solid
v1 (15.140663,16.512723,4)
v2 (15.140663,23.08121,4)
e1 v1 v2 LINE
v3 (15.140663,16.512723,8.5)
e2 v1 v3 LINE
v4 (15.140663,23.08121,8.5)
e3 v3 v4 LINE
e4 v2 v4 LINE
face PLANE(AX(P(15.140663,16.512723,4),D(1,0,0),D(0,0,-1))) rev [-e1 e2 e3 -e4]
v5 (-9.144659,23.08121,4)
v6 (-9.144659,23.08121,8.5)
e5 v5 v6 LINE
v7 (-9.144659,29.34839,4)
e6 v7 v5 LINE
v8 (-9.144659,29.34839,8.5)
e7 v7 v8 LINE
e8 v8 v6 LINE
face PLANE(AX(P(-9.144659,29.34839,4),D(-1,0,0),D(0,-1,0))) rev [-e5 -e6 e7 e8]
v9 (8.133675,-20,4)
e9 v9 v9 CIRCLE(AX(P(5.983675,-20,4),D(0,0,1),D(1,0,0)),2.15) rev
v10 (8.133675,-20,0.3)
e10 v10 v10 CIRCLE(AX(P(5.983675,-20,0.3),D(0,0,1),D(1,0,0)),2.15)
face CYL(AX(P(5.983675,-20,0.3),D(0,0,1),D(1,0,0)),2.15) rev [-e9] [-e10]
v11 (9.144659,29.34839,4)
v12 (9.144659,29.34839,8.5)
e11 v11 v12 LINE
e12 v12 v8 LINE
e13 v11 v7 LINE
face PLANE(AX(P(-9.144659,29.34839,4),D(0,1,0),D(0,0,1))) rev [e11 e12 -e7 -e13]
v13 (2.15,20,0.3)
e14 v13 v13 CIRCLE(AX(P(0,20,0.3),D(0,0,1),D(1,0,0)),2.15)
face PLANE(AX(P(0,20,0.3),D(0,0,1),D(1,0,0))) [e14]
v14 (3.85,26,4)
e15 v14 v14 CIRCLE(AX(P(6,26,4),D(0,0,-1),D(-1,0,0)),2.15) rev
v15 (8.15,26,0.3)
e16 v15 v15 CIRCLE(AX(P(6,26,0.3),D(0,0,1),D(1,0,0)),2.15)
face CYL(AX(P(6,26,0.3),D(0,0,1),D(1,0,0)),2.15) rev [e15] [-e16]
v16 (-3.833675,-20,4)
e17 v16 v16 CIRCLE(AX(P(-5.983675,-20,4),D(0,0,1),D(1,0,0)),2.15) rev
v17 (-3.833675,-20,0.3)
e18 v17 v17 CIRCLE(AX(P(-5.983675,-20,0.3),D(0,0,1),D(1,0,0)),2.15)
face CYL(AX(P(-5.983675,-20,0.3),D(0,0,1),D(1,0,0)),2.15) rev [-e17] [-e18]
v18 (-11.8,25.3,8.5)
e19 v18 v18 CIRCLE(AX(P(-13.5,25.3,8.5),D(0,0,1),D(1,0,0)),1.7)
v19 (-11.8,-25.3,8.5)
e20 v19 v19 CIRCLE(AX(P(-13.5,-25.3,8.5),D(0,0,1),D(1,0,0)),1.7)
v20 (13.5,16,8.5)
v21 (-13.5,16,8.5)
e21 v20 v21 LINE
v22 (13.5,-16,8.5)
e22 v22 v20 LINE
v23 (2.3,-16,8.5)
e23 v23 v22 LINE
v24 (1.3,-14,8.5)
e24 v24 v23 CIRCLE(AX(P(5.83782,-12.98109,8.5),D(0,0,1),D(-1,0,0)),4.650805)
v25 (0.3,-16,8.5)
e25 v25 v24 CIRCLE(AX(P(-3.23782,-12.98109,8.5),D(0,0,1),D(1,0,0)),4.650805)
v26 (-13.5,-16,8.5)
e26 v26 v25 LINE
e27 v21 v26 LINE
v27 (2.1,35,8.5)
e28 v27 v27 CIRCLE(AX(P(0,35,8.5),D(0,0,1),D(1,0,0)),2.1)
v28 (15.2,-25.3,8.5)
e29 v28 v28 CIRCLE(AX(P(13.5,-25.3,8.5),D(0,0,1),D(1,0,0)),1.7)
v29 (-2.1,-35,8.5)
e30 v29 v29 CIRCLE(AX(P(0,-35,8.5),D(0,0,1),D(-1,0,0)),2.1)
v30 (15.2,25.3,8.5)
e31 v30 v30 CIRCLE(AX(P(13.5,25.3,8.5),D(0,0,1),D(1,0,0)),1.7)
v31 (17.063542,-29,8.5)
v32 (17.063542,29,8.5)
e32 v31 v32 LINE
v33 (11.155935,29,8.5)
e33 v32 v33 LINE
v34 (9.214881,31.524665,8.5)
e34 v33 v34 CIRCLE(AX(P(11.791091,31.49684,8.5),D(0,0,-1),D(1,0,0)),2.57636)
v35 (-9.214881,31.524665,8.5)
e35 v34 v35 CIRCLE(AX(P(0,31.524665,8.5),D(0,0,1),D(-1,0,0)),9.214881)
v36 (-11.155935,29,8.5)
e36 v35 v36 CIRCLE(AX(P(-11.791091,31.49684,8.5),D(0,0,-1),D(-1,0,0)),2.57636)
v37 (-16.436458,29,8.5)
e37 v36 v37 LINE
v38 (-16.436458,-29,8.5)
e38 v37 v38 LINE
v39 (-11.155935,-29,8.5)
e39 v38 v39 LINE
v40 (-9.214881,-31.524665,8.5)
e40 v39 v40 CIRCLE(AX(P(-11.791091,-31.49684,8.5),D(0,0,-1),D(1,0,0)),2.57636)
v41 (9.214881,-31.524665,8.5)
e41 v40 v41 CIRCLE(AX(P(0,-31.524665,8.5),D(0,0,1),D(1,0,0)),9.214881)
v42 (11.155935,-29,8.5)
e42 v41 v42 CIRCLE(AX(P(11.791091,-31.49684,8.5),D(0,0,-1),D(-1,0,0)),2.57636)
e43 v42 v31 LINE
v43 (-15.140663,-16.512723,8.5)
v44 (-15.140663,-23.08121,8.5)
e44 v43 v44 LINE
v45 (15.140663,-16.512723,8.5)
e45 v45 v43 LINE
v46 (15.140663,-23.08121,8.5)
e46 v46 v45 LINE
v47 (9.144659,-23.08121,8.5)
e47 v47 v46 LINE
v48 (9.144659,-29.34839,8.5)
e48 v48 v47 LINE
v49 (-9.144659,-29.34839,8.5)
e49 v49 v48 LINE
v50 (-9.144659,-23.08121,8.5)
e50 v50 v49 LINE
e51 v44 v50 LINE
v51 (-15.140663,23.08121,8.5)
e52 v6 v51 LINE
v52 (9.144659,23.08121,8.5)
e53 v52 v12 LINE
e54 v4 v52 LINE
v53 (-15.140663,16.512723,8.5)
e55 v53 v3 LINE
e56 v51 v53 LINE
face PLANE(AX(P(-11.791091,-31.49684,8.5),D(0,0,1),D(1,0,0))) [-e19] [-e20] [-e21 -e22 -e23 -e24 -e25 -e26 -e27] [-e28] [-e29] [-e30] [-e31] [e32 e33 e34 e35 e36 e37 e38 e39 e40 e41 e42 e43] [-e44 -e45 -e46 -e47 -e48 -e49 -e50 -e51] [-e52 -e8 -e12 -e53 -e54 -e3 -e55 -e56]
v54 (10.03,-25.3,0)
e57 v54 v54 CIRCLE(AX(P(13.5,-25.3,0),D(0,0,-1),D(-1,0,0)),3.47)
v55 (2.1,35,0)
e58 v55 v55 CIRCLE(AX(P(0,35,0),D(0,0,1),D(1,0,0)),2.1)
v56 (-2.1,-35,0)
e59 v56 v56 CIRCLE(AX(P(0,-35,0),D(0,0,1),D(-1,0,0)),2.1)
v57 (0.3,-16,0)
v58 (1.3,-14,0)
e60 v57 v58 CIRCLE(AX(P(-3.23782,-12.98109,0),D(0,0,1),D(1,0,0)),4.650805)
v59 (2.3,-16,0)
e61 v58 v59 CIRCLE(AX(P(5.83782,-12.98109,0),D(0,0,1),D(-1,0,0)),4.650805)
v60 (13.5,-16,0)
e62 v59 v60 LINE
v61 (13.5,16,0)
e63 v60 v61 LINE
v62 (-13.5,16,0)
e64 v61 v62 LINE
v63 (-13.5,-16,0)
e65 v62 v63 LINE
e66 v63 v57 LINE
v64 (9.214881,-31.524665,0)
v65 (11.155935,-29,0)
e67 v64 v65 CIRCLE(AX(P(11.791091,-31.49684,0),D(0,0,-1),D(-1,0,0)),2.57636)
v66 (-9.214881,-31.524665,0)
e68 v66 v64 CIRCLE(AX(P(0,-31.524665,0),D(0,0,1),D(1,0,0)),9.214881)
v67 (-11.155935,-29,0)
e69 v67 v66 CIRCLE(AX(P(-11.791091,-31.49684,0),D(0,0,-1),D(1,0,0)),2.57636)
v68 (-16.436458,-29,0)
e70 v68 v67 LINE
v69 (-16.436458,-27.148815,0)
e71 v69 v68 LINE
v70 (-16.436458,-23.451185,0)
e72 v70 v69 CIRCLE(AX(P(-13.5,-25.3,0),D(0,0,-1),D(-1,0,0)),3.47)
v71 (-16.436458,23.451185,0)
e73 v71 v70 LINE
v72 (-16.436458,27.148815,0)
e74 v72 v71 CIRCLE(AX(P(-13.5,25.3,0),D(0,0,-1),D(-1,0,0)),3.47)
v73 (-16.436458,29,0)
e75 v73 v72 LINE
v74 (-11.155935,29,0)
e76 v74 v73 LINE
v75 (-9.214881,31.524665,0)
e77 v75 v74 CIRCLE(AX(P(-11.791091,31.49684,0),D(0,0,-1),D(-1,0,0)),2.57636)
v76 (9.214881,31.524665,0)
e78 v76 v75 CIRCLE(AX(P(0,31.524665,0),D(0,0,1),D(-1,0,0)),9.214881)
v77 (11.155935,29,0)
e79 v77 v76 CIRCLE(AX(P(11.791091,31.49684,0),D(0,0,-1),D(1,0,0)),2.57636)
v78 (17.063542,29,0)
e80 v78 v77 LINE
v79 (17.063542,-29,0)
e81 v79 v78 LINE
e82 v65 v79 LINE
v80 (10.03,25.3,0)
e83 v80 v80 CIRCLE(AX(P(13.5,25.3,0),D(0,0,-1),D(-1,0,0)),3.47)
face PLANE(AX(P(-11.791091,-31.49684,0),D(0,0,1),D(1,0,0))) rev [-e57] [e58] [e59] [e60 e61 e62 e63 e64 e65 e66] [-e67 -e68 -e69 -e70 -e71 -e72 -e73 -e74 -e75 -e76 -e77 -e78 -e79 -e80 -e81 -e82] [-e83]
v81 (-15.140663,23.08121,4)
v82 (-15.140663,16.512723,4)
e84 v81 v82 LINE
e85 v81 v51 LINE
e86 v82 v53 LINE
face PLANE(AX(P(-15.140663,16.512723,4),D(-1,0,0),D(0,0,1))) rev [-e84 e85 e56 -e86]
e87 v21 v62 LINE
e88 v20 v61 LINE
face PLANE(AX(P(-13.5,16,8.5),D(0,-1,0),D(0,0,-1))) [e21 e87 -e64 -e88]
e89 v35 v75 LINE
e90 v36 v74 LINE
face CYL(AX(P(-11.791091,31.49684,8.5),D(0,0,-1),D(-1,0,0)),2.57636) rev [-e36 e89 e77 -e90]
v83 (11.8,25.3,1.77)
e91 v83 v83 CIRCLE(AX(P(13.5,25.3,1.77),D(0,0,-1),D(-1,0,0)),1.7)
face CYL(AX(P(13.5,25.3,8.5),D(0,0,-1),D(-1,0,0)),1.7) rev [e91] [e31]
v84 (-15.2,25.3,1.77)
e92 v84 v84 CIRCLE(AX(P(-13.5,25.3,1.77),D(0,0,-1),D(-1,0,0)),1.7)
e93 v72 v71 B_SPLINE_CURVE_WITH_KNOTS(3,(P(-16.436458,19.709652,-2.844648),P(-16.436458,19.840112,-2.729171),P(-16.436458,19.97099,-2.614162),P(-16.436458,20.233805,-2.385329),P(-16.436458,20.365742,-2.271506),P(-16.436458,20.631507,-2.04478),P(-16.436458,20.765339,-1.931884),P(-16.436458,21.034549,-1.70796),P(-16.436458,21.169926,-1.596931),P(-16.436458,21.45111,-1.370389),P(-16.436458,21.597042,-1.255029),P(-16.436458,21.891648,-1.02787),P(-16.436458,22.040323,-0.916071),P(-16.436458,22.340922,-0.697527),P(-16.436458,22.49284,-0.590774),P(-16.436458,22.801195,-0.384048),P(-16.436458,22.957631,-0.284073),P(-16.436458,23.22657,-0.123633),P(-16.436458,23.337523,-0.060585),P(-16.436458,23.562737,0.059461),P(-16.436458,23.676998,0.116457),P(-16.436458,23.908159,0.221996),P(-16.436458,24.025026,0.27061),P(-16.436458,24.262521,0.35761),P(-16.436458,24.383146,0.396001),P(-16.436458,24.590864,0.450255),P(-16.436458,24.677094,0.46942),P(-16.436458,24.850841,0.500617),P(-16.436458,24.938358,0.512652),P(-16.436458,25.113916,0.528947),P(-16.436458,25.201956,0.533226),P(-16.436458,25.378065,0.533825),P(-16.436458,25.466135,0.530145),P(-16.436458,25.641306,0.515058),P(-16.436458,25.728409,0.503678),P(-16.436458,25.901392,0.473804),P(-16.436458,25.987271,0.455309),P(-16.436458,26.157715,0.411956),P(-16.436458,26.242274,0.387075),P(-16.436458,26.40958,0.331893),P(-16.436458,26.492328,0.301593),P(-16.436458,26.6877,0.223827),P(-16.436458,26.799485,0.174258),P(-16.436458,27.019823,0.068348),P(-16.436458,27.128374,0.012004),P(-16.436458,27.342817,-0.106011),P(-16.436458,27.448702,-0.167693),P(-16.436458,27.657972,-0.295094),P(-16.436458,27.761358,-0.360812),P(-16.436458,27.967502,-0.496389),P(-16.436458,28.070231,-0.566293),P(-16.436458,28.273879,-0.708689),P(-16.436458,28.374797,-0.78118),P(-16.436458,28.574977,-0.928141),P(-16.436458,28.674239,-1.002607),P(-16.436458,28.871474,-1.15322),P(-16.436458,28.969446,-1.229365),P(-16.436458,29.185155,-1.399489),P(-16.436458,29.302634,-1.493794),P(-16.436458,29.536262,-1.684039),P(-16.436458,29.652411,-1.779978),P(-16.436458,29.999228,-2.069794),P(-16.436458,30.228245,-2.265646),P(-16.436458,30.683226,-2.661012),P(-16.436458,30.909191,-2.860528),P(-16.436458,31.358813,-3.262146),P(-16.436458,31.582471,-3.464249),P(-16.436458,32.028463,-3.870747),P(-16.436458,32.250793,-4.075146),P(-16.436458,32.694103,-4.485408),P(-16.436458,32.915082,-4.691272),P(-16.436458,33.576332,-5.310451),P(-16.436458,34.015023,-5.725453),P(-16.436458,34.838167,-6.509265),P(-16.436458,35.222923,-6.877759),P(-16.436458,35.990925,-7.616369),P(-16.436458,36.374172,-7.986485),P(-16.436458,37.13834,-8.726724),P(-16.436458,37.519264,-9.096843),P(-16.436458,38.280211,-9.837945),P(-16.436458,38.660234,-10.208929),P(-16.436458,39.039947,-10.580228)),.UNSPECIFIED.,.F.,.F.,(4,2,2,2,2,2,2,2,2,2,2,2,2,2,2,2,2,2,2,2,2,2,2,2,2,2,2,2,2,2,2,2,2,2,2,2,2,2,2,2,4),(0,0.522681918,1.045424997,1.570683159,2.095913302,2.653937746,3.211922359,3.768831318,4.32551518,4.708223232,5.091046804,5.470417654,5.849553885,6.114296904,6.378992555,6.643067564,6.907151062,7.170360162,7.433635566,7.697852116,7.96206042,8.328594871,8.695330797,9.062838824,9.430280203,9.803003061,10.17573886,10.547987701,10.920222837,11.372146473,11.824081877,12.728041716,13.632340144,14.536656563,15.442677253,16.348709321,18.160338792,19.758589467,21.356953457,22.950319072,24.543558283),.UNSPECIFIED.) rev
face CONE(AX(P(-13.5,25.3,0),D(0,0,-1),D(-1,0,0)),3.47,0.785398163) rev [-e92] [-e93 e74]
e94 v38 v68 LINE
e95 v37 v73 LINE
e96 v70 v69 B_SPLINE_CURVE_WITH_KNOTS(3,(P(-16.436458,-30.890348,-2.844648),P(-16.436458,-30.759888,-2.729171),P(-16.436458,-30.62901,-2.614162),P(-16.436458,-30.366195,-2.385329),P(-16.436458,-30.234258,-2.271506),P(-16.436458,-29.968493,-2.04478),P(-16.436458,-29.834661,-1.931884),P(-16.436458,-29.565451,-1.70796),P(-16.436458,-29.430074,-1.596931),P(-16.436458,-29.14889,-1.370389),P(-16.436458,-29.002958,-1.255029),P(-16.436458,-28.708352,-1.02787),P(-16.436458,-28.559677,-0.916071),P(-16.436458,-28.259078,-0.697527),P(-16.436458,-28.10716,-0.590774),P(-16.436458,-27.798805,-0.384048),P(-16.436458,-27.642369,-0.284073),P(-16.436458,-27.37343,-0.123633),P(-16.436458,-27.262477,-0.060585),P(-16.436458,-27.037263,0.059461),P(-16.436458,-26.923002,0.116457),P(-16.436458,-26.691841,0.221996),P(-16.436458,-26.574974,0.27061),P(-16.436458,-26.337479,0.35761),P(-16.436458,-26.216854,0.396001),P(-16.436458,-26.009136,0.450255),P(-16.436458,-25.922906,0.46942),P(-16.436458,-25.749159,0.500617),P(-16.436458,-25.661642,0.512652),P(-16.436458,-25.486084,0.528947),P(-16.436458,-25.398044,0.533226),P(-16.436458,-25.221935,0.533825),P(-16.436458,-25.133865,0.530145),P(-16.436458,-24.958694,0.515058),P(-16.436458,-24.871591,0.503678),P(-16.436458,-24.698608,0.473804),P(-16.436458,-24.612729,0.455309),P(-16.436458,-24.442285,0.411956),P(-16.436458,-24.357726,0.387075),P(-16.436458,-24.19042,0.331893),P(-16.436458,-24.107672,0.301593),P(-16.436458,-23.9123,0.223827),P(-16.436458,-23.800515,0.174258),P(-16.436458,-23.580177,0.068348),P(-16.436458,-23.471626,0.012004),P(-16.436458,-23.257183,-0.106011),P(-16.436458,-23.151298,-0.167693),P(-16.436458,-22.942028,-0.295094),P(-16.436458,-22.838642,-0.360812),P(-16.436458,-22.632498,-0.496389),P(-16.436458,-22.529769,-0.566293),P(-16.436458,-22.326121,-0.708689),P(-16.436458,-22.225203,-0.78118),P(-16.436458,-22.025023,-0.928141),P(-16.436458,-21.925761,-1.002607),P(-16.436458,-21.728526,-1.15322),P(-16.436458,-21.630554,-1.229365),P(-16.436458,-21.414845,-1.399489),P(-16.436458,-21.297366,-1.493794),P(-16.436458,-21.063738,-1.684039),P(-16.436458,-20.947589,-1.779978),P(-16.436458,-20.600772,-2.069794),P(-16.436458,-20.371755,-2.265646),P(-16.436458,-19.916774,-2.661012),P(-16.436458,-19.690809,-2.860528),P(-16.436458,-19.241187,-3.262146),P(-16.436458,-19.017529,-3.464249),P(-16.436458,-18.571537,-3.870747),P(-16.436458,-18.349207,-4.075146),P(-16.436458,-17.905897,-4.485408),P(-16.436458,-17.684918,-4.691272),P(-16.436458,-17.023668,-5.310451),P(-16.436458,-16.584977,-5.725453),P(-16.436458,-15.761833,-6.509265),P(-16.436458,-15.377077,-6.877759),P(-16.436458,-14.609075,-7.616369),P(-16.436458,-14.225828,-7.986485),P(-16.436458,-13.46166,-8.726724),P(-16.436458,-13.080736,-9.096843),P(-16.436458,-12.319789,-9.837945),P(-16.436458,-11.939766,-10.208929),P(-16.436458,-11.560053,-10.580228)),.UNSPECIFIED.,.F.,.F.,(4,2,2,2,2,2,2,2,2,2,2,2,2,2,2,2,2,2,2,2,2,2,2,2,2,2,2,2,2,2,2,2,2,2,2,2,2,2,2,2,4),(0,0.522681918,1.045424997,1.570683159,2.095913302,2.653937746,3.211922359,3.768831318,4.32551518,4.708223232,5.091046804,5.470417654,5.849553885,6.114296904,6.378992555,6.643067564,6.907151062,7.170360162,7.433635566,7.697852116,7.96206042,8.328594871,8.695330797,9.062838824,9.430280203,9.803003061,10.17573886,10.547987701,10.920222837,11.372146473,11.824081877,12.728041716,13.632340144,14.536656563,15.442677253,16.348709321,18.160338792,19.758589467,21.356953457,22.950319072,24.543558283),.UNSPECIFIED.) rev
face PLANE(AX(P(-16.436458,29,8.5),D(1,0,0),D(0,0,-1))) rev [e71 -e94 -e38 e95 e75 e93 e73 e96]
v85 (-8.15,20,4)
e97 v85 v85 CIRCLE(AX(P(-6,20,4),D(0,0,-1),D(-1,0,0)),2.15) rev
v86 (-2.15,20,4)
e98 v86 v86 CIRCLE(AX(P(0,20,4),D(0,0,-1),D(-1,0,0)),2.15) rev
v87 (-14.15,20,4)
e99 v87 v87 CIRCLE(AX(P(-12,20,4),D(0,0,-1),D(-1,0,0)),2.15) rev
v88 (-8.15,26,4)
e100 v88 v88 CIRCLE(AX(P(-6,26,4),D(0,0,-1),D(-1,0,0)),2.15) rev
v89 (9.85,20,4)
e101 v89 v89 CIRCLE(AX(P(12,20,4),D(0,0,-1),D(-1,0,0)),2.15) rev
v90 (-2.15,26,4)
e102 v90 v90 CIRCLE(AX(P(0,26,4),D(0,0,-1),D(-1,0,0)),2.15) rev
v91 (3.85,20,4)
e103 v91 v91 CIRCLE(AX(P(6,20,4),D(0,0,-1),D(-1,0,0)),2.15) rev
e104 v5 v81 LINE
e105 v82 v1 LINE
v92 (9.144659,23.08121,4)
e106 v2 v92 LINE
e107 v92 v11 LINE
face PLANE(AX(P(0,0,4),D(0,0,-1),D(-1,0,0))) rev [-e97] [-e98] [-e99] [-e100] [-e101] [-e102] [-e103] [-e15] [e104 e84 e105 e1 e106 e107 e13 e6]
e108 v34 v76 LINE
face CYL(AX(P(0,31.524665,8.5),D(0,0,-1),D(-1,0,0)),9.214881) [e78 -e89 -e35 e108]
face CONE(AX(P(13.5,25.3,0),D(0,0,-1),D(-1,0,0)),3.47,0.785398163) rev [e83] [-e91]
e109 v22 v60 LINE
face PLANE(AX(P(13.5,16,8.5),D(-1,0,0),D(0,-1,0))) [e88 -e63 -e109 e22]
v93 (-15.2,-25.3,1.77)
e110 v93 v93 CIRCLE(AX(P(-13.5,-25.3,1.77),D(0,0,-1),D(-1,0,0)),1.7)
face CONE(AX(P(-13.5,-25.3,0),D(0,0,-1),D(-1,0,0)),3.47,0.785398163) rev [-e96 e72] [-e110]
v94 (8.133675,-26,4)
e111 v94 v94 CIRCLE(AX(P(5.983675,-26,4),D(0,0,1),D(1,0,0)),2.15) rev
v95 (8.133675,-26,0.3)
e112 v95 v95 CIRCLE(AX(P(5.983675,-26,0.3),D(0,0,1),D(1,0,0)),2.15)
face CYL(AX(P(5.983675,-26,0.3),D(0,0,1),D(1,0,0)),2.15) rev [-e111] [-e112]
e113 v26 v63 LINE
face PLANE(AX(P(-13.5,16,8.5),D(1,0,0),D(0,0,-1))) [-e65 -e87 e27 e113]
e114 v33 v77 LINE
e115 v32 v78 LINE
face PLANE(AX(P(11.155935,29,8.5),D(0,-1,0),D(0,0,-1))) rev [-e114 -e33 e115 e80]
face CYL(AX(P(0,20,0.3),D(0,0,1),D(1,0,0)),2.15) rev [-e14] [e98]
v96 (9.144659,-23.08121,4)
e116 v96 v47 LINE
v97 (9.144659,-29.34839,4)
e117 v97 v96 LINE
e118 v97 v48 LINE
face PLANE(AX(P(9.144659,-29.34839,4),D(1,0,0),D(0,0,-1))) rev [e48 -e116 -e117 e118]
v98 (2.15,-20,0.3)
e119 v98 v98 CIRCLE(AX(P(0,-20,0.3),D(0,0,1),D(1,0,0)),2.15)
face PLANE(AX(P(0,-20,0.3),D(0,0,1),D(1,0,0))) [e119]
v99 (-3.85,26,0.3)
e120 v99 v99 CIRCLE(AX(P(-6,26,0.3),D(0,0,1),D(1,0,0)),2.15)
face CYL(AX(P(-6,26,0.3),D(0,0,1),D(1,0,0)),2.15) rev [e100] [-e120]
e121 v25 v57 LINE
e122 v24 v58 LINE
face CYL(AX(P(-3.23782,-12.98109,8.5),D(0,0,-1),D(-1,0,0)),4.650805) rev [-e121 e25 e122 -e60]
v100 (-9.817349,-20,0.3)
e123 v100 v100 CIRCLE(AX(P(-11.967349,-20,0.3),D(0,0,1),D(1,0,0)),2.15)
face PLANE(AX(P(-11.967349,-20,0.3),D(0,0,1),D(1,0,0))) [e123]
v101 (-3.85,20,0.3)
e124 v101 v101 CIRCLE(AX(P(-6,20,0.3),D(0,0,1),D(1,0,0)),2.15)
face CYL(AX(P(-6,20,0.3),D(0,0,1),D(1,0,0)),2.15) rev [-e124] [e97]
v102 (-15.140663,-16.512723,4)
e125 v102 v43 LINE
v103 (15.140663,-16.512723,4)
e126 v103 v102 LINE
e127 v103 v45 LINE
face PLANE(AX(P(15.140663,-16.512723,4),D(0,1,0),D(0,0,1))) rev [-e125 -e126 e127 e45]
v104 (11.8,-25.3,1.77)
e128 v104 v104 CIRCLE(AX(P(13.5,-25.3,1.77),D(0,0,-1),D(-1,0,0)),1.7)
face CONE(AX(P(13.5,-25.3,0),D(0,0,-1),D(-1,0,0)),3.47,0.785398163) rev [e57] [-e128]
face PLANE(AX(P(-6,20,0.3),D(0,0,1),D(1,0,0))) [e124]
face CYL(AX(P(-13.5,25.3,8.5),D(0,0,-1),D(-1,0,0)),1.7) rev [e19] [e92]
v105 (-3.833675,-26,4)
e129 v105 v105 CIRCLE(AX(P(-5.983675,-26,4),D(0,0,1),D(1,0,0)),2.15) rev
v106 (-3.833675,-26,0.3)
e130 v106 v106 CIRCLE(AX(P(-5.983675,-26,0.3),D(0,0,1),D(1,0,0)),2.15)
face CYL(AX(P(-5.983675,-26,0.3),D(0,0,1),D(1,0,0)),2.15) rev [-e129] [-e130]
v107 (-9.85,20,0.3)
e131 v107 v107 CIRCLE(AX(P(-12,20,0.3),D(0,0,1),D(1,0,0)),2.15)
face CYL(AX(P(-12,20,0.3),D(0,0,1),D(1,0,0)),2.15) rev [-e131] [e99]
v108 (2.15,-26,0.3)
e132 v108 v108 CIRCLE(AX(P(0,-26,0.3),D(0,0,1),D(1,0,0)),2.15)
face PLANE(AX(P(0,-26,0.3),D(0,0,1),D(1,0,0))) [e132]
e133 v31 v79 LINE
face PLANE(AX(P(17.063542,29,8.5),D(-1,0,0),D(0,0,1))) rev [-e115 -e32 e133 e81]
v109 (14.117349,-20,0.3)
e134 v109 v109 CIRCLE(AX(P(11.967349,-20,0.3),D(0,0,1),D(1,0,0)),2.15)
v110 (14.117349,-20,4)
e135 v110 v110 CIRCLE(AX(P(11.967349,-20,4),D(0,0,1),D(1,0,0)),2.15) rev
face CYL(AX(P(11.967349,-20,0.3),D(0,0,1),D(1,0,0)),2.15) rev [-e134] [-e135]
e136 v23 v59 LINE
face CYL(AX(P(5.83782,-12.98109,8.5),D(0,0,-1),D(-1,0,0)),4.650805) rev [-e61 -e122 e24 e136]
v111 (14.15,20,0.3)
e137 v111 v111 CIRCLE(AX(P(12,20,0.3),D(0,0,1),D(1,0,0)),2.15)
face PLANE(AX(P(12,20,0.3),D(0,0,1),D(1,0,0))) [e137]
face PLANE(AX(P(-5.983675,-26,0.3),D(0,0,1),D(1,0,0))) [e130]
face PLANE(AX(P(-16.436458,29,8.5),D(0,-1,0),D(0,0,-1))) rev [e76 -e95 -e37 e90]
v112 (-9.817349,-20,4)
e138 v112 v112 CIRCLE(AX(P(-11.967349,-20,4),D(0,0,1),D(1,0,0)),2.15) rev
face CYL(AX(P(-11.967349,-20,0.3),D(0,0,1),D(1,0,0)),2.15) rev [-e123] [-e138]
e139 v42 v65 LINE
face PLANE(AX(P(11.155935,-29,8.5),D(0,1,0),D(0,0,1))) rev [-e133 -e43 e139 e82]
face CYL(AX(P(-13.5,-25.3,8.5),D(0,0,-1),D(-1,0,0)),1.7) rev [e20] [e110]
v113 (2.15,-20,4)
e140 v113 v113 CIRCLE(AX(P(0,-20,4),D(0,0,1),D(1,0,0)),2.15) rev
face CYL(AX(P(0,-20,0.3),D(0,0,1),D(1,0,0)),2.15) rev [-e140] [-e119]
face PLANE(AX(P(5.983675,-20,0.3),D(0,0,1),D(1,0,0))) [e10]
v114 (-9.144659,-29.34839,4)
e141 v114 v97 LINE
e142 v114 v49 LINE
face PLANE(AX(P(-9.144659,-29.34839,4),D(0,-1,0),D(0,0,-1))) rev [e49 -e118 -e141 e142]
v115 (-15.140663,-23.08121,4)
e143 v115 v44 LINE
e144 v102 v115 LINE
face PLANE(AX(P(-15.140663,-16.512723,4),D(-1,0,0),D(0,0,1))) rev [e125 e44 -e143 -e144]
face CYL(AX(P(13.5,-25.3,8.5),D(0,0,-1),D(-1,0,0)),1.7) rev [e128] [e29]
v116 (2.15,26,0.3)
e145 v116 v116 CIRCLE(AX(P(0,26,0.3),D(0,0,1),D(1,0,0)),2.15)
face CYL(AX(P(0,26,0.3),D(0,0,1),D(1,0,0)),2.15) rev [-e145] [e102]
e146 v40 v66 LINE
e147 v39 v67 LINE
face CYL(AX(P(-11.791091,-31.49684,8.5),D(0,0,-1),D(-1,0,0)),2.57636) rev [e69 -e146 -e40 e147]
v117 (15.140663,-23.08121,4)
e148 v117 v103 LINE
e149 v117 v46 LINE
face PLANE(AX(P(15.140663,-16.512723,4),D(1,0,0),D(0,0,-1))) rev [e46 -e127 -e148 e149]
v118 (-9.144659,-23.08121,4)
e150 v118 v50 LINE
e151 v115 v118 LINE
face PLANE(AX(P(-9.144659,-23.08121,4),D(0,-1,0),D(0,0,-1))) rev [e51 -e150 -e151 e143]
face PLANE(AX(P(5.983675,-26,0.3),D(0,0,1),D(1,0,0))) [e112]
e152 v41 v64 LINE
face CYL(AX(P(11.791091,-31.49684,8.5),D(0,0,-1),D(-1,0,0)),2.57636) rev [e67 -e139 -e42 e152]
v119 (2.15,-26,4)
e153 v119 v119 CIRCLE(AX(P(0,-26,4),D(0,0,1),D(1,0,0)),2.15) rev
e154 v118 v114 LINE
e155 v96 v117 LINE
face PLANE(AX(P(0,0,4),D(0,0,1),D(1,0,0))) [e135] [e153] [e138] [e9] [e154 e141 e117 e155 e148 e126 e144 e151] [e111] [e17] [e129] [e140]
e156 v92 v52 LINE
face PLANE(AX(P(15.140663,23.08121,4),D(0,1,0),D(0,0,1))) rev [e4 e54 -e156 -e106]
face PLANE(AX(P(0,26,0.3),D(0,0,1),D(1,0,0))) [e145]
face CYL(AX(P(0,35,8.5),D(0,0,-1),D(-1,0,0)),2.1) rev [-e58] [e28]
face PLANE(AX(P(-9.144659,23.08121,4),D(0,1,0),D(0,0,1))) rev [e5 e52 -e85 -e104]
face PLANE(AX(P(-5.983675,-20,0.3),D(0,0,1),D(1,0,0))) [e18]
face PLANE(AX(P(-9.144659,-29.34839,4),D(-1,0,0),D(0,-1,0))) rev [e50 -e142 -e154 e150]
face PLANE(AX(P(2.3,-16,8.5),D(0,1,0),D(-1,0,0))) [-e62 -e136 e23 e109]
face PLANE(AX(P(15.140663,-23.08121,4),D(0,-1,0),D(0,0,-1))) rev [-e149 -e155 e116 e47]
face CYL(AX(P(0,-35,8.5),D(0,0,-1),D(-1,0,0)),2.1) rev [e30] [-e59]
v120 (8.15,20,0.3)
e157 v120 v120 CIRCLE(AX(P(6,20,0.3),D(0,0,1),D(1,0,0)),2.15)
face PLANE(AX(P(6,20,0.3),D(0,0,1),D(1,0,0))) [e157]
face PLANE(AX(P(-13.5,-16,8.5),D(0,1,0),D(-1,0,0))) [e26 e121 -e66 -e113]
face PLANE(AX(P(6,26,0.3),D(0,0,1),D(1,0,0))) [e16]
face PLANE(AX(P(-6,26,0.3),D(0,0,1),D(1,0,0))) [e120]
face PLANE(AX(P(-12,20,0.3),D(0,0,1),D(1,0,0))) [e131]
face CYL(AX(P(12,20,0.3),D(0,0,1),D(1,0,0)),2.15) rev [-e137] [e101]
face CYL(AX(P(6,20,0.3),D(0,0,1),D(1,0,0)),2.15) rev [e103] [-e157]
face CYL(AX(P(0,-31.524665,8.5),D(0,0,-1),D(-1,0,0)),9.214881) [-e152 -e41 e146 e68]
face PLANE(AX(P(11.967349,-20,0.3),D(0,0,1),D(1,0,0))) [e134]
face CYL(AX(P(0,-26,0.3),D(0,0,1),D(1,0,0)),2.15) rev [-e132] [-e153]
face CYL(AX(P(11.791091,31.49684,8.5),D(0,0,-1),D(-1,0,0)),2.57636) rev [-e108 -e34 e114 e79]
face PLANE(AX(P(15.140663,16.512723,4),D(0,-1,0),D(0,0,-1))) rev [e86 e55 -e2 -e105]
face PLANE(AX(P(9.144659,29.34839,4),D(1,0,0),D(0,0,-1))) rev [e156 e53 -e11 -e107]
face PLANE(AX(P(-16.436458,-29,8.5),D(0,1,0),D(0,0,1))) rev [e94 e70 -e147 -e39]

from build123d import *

# Parameters (mm, degrees)
SKETCH1_R           = 1.7
SKETCH1_R_2         = 2.1
BOSS_EXTRUDE1_DEPTH = 8.5
SKETCH2_R           = 2.15
CUT_EXTRUDE1_DEPTH  = 8.2
CUT_EXTRUDE3_DEPTH  = 4.5


# Read off the part's stored shape, not the designer's step: AdvancedHole1
with BuildPart() as part:
    # Sketch1 → Boss-Extrude1 (new body)
    with BuildSketch(Plane.XY):
        with BuildLine():
            Line((-16.436457619, 29), (-11.155935204, 29))
            ThreePointArc((-11.155935204, 29), (-9.748616749, 29.926511277), (-9.214880919, 31.524664725))
            ThreePointArc((-9.214880919, 31.524664725), (0, 40.739545643), (9.214880919, 31.524664725))
            ThreePointArc((9.214880919, 31.524664725), (9.748616749, 29.926511277), (11.155935204, 29))
            Line((11.155935204, 29), (17.063542381, 29))
            Line((17.063542381, 29), (17.063542381, -29))
            Line((17.063542381, -29), (11.155935204, -29))
            ThreePointArc((11.155935204, -29), (9.748616749, -29.926511277), (9.214880919, -31.524664725))
            ThreePointArc((9.214880919, -31.524664725), (0, -40.739545643), (-9.214880919, -31.524664725))
            ThreePointArc((-9.214880919, -31.524664725), (-9.748616749, -29.926511277), (-11.155935204, -29))
            Line((-11.155935204, -29), (-16.436457619, -29))
            Line((-16.436457619, -29), (-16.436457619, 29))
        make_face()
        with Locations((-13.5, 25.3)):
            Circle(SKETCH1_R, mode=Mode.SUBTRACT)
        with Locations((13.5, -25.3)):
            Circle(SKETCH1_R, mode=Mode.SUBTRACT)
        with Locations((-13.5, -25.3)):
            Circle(SKETCH1_R, mode=Mode.SUBTRACT)
        with Locations((13.5, 25.3)):
            Circle(SKETCH1_R, mode=Mode.SUBTRACT)
        with Locations((0, 35)):
            Circle(SKETCH1_R_2, mode=Mode.SUBTRACT)
        with Locations(Location((0, -35, 0), (0, 0, 180))):
            Circle(SKETCH1_R_2, mode=Mode.SUBTRACT)
        with BuildLine():
            Line((-13.5, 16), (13.5, 16))
            Line((13.5, 16), (13.5, -16))
            Line((13.5, -16), (2.3, -16))
            ThreePointArc((2.3, -16), (1.678013477, -15.060993262), (1.3, -14))
            ThreePointArc((1.3, -14), (0.921986523, -15.060993262), (0.3, -16))
            Line((0.3, -16), (-13.5, -16))
            Line((-13.5, -16), (-13.5, 16))
        make_face(mode=Mode.SUBTRACT)
    extrude(amount=BOSS_EXTRUDE1_DEPTH)

    # Sketch2 → Cut-Extrude1 (cut)
    with BuildSketch(Plane.XY.offset(8.5)):
        with Locations((-12, 20)):
            Circle(SKETCH2_R)
        with Locations((-6, 20)):
            Circle(SKETCH2_R)
        with Locations((0, 20)):
            Circle(SKETCH2_R)
        with Locations((6, 20)):
            Circle(SKETCH2_R)
        with Locations((12, 20)):
            Circle(SKETCH2_R)
        with Locations((-6, 26)):
            Circle(SKETCH2_R)
        with Locations((0, 26)):
            Circle(SKETCH2_R)
        with Locations((6, 26)):
            Circle(SKETCH2_R)
        with Locations((-11.967349369, -20)):
            Circle(SKETCH2_R)
        with Locations((-5.983674685, -20)):
            Circle(SKETCH2_R)
        with Locations((0, -20)):
            Circle(SKETCH2_R)
        with Locations((5.983674685, -20)):
            Circle(SKETCH2_R)
        with Locations((11.967349369, -20)):
            Circle(SKETCH2_R)
        with Locations((-5.983674685, -26)):
            Circle(SKETCH2_R)
        with Locations((0, -26)):
            Circle(SKETCH2_R)
        with Locations((5.983674685, -26)):
            Circle(SKETCH2_R)
    extrude(amount=-CUT_EXTRUDE1_DEPTH, mode=Mode.SUBTRACT)

    # AdvancedHole1 outline → AdvancedHole1 (revolve, cut)
    with BuildSketch(Plane(origin=(-13.5, -25.3, 0), x_dir=(1, 0, 0), z_dir=(0, -1, 0))):
        Polygon((3.47, 0), (1.7, 1.77), (1.7, 0), align=None)
    revolve(axis=Axis((-13.5, -25.3, 0), (0, 0, 1)), mode=Mode.SUBTRACT)

    # AdvancedHole1 2 outline → AdvancedHole1 2 (revolve, cut)
    with BuildSketch(Plane(origin=(13.5, -25.3, 0), x_dir=(1, 0, 0), z_dir=(0, -1, 0))):
        Polygon((3.47, 0), (1.7, 1.77), (1.7, 0), align=None)
    revolve(axis=Axis((13.5, -25.3, 0), (0, 0, 1)), mode=Mode.SUBTRACT)

    # AdvancedHole1 3 outline → AdvancedHole1 3 (revolve, cut)
    with BuildSketch(Plane(origin=(-13.5, 25.3, 0), x_dir=(1, 0, 0), z_dir=(0, -1, 0))):
        Polygon((3.47, 0), (1.7, 1.77), (1.7, 0), align=None)
    revolve(axis=Axis((-13.5, 25.3, 0), (0, 0, 1)), mode=Mode.SUBTRACT)

    # AdvancedHole1 4 outline → AdvancedHole1 4 (revolve, cut)
    with BuildSketch(Plane(origin=(13.5, 25.3, 0), x_dir=(1, 0, 0), z_dir=(0, -1, 0))):
        Polygon((3.47, 0), (1.7, 1.77), (1.7, 0), align=None)
    revolve(axis=Axis((13.5, 25.3, 0), (0, 0, 1)), mode=Mode.SUBTRACT)

    # Sketch6 → Cut-Extrude3 (cut)
    with BuildSketch(Plane.XY.offset(8.5)):
        Polygon((-9.144659307, 29.348390155), (9.144659307, 29.348390155), (9.144659307, 23.081210136), (15.140663267, 23.081210136), (15.140663267, 16.512723385), (-15.140663267, 16.512723385), (-15.140663267, 23.081210136), (-9.144659307, 23.081210136), align=None)
        Polygon((-9.144659307, -23.081210136), (-15.140663267, -23.081210136), (-15.140663267, -16.512723385), (15.140663267, -16.512723385), (15.140663267, -23.081210136), (9.144659307, -23.081210136), (9.144659307, -29.348390155), (-9.144659307, -29.348390155), align=None)
    extrude(amount=-CUT_EXTRUDE3_DEPTH, mode=Mode.SUBTRACT)


solid = part.part
